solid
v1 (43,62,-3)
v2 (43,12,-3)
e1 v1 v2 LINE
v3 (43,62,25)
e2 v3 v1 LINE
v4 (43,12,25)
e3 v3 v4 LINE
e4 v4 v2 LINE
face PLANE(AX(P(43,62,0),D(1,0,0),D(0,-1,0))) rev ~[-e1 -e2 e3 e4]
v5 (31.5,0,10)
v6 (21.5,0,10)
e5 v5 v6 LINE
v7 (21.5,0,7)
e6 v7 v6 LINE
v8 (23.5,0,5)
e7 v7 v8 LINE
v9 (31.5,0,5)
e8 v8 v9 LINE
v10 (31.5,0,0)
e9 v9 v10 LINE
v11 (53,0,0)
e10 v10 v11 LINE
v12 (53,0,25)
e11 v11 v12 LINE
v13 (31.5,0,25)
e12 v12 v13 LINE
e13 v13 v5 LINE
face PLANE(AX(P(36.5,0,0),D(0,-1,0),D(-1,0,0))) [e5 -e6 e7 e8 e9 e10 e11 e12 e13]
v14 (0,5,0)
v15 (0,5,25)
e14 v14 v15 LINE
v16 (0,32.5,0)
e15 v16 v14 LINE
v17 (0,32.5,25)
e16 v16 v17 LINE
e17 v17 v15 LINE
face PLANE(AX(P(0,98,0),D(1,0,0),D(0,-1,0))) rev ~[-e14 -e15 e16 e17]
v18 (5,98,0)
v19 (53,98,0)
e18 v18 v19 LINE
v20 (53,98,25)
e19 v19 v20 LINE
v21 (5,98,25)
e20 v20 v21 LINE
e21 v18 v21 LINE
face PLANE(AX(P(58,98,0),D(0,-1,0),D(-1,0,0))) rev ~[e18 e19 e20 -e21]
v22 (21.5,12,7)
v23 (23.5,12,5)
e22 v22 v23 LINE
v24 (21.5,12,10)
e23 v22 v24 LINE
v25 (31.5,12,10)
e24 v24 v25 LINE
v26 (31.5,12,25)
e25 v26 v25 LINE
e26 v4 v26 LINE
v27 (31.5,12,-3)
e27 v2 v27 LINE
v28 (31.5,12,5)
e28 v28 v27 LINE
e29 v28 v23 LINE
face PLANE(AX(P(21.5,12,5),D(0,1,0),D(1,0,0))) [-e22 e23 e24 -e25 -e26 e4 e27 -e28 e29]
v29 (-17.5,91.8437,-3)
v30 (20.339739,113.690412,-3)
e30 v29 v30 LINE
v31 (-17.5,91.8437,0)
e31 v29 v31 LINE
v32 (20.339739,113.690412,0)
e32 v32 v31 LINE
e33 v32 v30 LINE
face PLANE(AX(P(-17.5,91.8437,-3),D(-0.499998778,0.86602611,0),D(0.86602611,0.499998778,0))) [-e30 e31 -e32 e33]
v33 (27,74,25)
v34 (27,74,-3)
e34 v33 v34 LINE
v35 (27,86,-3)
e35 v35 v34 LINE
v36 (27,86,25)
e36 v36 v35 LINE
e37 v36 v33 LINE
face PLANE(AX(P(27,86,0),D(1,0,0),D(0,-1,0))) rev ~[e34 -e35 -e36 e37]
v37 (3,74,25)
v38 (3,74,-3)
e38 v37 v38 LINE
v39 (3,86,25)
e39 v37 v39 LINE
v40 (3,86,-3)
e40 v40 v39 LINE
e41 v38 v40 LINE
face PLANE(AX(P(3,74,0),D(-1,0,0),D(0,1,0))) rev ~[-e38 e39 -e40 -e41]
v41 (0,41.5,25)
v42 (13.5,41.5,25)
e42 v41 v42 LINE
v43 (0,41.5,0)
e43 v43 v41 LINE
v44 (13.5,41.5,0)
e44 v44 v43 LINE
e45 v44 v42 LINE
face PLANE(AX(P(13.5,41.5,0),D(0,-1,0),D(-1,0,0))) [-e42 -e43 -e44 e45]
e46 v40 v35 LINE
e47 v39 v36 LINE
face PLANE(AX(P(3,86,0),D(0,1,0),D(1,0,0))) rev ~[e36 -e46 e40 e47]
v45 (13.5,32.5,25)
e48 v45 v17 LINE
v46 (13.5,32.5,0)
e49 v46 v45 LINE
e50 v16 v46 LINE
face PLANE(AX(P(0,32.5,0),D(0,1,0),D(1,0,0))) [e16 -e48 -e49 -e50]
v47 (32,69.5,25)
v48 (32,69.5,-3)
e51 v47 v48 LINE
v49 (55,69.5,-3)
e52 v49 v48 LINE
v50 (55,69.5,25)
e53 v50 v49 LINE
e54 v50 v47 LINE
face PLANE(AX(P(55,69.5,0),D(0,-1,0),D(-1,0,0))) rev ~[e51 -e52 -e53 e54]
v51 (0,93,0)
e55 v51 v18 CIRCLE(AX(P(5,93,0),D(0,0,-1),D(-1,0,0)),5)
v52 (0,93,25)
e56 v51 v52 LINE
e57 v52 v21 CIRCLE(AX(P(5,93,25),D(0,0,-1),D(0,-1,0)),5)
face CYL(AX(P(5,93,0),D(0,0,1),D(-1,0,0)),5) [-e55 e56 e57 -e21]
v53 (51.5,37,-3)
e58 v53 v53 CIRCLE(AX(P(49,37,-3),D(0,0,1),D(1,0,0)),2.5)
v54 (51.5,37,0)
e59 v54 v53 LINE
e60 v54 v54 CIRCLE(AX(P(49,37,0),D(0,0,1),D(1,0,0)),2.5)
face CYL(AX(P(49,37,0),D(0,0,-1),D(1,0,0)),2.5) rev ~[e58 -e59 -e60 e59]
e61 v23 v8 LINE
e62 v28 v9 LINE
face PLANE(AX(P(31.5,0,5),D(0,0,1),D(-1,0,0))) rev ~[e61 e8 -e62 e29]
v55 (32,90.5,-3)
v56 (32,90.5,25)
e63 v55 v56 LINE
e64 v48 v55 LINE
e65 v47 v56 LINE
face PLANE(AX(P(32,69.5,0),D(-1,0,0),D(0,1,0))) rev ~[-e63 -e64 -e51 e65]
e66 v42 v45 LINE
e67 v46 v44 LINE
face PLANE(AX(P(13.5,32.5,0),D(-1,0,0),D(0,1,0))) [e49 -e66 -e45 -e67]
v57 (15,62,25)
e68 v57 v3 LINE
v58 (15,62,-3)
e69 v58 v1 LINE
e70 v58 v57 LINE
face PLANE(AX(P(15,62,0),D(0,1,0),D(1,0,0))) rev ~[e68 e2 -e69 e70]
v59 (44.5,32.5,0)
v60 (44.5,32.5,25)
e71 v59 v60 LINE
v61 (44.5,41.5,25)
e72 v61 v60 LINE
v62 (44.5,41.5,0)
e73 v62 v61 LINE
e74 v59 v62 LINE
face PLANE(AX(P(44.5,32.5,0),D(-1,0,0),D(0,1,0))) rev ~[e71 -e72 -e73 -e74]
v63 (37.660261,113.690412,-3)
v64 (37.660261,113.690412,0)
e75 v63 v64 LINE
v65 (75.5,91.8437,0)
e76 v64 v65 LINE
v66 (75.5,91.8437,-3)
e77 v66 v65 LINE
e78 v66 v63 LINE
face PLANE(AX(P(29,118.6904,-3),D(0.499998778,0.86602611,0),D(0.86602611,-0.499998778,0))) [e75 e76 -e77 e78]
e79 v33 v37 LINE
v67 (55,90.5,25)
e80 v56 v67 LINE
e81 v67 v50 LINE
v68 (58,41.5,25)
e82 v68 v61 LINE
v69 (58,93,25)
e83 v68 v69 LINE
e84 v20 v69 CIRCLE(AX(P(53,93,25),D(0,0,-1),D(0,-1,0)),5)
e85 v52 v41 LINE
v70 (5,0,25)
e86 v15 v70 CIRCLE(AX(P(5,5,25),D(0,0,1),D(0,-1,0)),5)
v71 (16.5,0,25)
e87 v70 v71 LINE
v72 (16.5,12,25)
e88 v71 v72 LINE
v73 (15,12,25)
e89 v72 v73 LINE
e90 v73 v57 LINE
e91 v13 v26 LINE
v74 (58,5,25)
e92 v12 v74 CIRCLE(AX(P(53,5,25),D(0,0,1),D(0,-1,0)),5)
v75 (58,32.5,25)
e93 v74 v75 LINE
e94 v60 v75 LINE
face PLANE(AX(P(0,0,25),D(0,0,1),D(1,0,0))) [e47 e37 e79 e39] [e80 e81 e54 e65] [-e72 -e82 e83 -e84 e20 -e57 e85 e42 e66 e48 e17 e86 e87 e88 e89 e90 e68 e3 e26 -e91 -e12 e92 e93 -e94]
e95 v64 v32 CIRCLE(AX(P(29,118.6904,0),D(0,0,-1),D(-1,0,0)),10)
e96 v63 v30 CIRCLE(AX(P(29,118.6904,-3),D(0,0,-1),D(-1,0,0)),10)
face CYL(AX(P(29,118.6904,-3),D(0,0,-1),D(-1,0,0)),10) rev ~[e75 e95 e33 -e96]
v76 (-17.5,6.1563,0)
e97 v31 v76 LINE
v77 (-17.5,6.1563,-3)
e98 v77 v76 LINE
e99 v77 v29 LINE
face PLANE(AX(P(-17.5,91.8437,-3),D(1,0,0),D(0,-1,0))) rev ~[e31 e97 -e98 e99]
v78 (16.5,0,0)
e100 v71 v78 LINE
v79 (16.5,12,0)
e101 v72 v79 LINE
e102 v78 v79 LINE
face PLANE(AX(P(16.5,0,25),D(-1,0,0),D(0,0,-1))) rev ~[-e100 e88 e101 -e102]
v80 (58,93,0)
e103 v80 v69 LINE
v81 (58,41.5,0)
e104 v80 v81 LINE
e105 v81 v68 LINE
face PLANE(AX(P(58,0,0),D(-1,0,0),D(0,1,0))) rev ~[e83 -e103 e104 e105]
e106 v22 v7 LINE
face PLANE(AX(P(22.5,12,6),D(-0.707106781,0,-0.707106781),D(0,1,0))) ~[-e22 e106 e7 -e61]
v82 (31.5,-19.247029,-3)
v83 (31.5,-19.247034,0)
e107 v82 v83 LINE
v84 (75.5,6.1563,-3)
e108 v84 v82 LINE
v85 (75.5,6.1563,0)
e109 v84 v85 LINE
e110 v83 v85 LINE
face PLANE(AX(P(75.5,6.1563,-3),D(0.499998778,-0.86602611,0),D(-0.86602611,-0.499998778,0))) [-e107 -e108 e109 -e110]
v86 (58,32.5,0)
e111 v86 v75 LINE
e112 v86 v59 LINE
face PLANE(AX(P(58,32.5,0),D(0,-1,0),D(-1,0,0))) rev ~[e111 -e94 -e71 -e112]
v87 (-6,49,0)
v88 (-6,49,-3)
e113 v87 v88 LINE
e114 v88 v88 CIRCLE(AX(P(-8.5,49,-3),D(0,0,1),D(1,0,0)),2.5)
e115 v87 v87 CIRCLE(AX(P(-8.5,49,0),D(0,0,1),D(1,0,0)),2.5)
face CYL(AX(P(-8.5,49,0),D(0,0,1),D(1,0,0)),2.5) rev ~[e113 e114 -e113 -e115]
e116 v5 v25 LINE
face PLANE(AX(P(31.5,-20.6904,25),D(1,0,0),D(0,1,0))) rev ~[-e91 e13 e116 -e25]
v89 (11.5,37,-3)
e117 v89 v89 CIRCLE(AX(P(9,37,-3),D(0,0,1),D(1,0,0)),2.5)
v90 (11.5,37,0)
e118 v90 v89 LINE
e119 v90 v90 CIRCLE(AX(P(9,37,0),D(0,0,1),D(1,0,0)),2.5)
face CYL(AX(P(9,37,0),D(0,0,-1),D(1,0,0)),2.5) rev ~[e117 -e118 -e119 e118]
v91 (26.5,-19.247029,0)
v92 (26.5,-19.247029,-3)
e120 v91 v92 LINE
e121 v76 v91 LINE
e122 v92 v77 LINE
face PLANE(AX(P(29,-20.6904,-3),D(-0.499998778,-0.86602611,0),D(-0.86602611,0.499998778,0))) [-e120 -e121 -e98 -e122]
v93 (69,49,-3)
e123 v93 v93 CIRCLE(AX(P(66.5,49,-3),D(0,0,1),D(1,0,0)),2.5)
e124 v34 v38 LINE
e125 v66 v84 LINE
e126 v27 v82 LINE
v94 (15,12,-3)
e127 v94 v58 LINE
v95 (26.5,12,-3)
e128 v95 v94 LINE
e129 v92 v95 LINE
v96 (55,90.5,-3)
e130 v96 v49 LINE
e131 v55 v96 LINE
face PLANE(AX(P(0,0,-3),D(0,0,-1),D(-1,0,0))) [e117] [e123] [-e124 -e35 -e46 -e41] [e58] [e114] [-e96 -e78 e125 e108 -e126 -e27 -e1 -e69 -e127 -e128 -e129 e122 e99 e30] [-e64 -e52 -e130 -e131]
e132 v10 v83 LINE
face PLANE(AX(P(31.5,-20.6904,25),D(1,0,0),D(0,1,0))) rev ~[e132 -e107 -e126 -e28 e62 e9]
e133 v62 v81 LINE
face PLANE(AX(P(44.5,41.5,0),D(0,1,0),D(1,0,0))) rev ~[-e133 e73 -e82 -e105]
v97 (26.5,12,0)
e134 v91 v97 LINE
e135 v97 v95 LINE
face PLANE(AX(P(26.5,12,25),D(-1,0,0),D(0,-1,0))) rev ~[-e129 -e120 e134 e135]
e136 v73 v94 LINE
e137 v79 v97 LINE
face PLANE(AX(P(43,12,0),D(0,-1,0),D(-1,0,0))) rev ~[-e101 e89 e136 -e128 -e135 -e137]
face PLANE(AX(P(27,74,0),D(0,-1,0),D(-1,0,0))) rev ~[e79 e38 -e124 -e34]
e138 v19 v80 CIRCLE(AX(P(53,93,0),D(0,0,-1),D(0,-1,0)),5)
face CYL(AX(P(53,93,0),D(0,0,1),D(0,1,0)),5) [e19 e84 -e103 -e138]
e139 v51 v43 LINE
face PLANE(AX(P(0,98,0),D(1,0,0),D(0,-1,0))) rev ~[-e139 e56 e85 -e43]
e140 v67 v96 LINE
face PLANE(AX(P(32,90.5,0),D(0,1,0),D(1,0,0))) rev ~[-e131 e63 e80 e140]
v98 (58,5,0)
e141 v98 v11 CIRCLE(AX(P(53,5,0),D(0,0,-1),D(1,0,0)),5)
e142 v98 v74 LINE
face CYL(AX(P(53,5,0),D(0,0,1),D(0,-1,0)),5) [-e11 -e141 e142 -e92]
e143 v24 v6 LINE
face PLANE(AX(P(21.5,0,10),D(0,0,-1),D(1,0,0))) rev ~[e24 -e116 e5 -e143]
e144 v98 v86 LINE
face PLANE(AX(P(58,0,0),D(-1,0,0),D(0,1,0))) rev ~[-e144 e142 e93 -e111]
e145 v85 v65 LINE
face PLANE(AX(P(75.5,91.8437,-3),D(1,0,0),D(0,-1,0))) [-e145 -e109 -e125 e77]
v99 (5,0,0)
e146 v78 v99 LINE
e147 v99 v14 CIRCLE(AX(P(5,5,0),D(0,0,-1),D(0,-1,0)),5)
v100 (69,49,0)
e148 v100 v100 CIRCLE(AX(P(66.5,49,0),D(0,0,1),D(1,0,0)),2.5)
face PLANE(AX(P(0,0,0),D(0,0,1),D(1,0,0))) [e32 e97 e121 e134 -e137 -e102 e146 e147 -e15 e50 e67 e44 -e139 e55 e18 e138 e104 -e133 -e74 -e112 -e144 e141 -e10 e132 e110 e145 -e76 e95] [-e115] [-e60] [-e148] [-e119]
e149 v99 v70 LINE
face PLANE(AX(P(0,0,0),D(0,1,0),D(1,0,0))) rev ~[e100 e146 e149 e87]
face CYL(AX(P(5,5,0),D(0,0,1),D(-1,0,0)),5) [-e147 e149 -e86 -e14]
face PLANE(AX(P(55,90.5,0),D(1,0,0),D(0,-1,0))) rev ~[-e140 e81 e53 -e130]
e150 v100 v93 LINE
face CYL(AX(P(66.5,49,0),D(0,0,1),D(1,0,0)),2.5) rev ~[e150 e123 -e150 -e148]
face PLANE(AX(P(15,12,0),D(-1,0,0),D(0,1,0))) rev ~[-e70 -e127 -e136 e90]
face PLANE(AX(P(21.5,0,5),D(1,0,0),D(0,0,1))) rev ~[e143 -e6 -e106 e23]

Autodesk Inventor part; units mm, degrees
ref_plane "YZ Plane" through (0, 0, 0) normal (1, 0, 0) x (0, 1, 0)
ref_plane "XZ Plane" through (0, 0, 0) normal (0, 1, 0) x (-1, 0, 0)
ref_plane "XY Plane" through (0, 0, 0) normal (0, 0, 1) x (1, 0, 0)
sketch "Sketch1" plane through (0, 0, 0) normal (0, 0, 1) x (1, 0, 0)
  line L0 (0, 0) -> (58, 0)
  line L1 (58, 0) -> (58, 98)
  line L2 (58, 98) -> (0, 98)
  line L3 (0, 98) -> (0, 0)
  line L4 (15, 62) -> (43, 62)
  line L5 (43, 62) -> (43, 12)
  line L6 (43, 12) -> (15, 12)
  line L7 (15, 12) -> (15, 62)
  circle A0 centre (9, 37) radius 2.5
  circle A1 centre (49, 37) radius 2.5
  line L8 (9, 37) -> (49, 37) construction
  line L9 (3, 86) -> (27, 86)
  line L10 (27, 86) -> (27, 74)
  line L11 (27, 74) -> (3, 74)
  line L12 (3, 74) -> (3, 86)
  circle A2 centre (-8.5, 49) radius 2.5
  circle A3 centre (66.5, 49) radius 2.5
  line L13 (-8.5, 49) -> (66.5, 49) construction
  circle A4 centre (-8.5, 49) radius 5 construction
  circle A5 centre (66.5, 49) radius 5 construction
  line L14 (0, 0) -> (-13.3155, 47.6544)
  line L15 (0, 98) -> (-13.3155, 50.3456)
  line L16 (58, 98) -> (71.3155, 50.3456)
  line L17 (58, 0) -> (71.3155, 47.6544)
  arc A6 (-13.3155, 50.3456) -> (-13.3155, 47.6544) centre (-8.5, 49) ccw
  arc A7 (71.3155, 47.6544) -> (71.3155, 50.3456) centre (66.5, 49) ccw
  line L18 (32, 90.5) -> (55, 90.5)
  line L19 (55, 90.5) -> (55, 69.5)
  line L20 (55, 69.5) -> (32, 69.5)
  line L21 (32, 69.5) -> (32, 90.5)
  line L22 (3, 80) -> (55, 80) construction
  point P0 (29, 62)
  point P1 (29, 98)
  point P2 (29, 37)
  point P3 (15, 37)
  point P4 (29, 49)
  point P5 (0, 49)
  point P6 (29, 80)
  dimension "d0" = 58
  dimension "d1" = 98
  dimension "d2" = 28
  dimension "d3" = 50
  dimension "d4" = 12
  dimension "d5" = 5
  dimension "d6" = 5
  dimension "d7" = 40
  dimension "d9" = 24
  dimension "d10" = 12
  dimension "d12" = 12
  dimension "d13" = 5
  dimension "d14" = 5
  dimension "d15" = 75
  dimension "d16" = 10
  dimension "d17" = 10
  dimension "d18" = 23
  dimension "d19" = 21
  dimension "d20" = 5
extrude "Extrusion1" add sketch "Sketch1" against normal blind 3
extrude "Extrusion2" add sketch "Sketch1" along normal blind 25 contours L3 L2 L1 L0
fillet "Fillet1" radius 5 4 edges at (58, 98, 12.5) (58, 0, 12.5) (0, 0, 12.5) (0, 98, 12.5)
sketch "Sketch2" plane through (0, 0, 0) normal (0, 0, 1) x (1, 0, 0)
  circle A0 centre (49, 37) radius 2.5 projected
  circle A1 centre (9, 37) radius 2.5 projected
  line L0 (0, 5) -> (0, 93) projected
  line L1 (0, 32.5) -> (13.5, 32.5)
  line L2 (13.5, 32.5) -> (13.5, 41.5)
  line L3 (13.5, 41.5) -> (0, 41.5)
  line L4 (0, 41.5) -> (0, 32.5)
  line L5 (58, 5) -> (58, 93) projected
  line L6 (58, 32.5) -> (44.5, 32.5)
  line L7 (44.5, 32.5) -> (44.5, 41.5)
  line L8 (44.5, 41.5) -> (58, 41.5)
  line L9 (58, 41.5) -> (58, 32.5)
  line L10 (15, 62) -> (15, 12) projected
  line L11 (43, 12) -> (43, 62) projected
  point P0 (0, 0)
  point P1 (13.5, 37)
  point P2 (44.5, 37)
  dimension "d29" = 4.5
  dimension "d30" = 4.5
  dimension "d31" = 9
extrude "Extrusion3" cut sketch "Sketch2" along normal through all
sketch "Sketch3" plane through (0, 0, -3) normal (0, 0, -1) x (-1, 0, 0)
  circle A0 centre (-29, -5) radius 2.5 construction
  circle A1 centre (-29, 103) radius 2.5 construction
  line L0 (0, 98) -> (-58, 98) projected
  line L1 (-58, 0) -> (0, 0) projected
  line L2 (-58, 98) -> (-29.6325, 105.4187)
  line L3 (0, 98) -> (-28.3675, 105.4187)
  line L4 (0, 0) -> (-28.3675, -7.4187)
  line L5 (-58, 0) -> (-29.6325, -7.4187)
  arc A2 (-29.6325, -7.4187) -> (-28.3675, -7.4187) centre (-29, -5) ccw
  arc A3 (-28.3675, 105.4187) -> (-29.6325, 105.4187) centre (-29, 103) ccw
  point P0 (-29, 98)
  dimension "d34" = 5
  dimension "d35" = 5
  dimension "d36" = 5
  dimension "d37" = 5
extrude "Extrusion4" add sketch "Sketch3" against normal blind 3
fillet "Fillet2" radius 5 4 edges at (0, 98, -1.5) (58, 98, -1.5) (58, 0, -1.5) (0, 0, -1.5)
sketch "Sketch4" plane through (0, 0, -3) normal (0, 0, -1) x (-1, 0, 0)
  line L0 (-15, 62) -> (-15, 12) projected
  line L1 (-15, 12) -> (-43, 12) projected
  line L2 (-43, 12) -> (-43, 62) projected
  line L3 (-43, 62) -> (-15, 62) projected
  line L4 (-32, 90.5) -> (-32, 69.5) projected
  line L5 (-32, 69.5) -> (-55, 69.5) projected
  line L6 (-55, 69.5) -> (-55, 90.5) projected
  line L7 (-55, 90.5) -> (-32, 90.5) projected
  line L8 (-3, 86) -> (-3, 74) projected
  line L9 (-3, 74) -> (-27, 74) projected
  line L10 (-27, 74) -> (-27, 86) projected
  line L11 (-27, 86) -> (-3, 86) projected
  circle A0 centre (-49, 37) radius 2.5 projected
  circle A1 centre (-9, 37) radius 2.5 projected
  circle A2 centre (-66.5, 49) radius 2.5 projected
  circle A3 centre (8.5, 49) radius 2.5 projected
  arc A4 (-2.7778, -0.7265) -> (0.7727, 2.7653) centre (-4.0429, 4.1109) ccw projected
  line L12 (0.7727, 2.7653) -> (13.3155, 47.6544) projected
  arc A5 (13.3155, 47.6544) -> (13.3155, 50.3456) centre (8.5, 49) ccw projected
  line L13 (13.3155, 50.3456) -> (0.7727, 95.2347) projected
  arc A6 (0.7727, 95.2347) -> (-2.7778, 98.7265) centre (-4.0429, 93.8891) ccw projected
  line L14 (-28.3675, 105.4187) -> (-2.7778, 98.7265) projected
  arc A7 (-28.3675, 105.4187) -> (-29.6325, 105.4187) centre (-29, 103) ccw projected
  line L15 (-55.2222, 98.7265) -> (-29.6325, 105.4187) projected
  arc A8 (-55.2222, 98.7265) -> (-58.7727, 95.2347) centre (-53.9571, 93.8891) ccw projected
  line L16 (-58.7727, 95.2347) -> (-71.3155, 50.3456) projected
  arc A9 (-71.3155, 50.3456) -> (-71.3155, 47.6544) centre (-66.5, 49) ccw projected
  line L17 (-71.3155, 47.6544) -> (-58.7727, 2.7653) projected
  arc A10 (-58.7727, 2.7653) -> (-55.2222, -0.7265) centre (-53.9571, 4.1109) ccw projected
  line L18 (-55.2222, -0.7265) -> (-29.6325, -7.4187) projected
  arc A11 (-29.6325, -7.4187) -> (-28.3675, -7.4187) centre (-29, -5) ccw projected
  line L19 (-28.3675, -7.4187) -> (-2.7778, -0.7265) projected
  arc A12 (-27.3554, 109.2885) -> (-30.6446, 109.2885) centre (-29, 103) ccw
  line L20 (-27.3554, 109.2885) -> (-1.7658, 102.5963)
  arc A13 (4.6251, 96.3111) -> (-1.7658, 102.5963) centre (-4.0429, 93.8891) ccw
  line L21 (4.6251, 96.3111) -> (17.168, 51.422)
  arc A14 (17.168, 46.578) -> (17.168, 51.422) centre (8.5, 49) ccw
  line L22 (17.168, 46.578) -> (4.6251, 1.6889)
  arc A15 (-1.7658, -4.5963) -> (4.6251, 1.6889) centre (-4.0429, 4.1109) ccw
  line L23 (-1.7658, -4.5963) -> (-27.3554, -11.2885)
  arc A16 (-30.6446, -11.2885) -> (-27.3554, -11.2885) centre (-29, -5) ccw
  line L24 (-30.6446, -11.2885) -> (-56.2342, -4.5963)
  arc A17 (-62.6251, 1.6889) -> (-56.2342, -4.5963) centre (-53.9571, 4.1109) ccw
  line L25 (-62.6251, 1.6889) -> (-75.168, 46.578)
  arc A18 (-75.168, 51.422) -> (-75.168, 46.578) centre (-66.5, 49) ccw
  line L26 (-75.168, 51.422) -> (-62.6251, 96.3111)
  arc A19 (-56.2342, 102.5963) -> (-62.6251, 96.3111) centre (-53.9571, 93.8891) ccw
  line L27 (-56.2342, 102.5963) -> (-30.6446, 109.2885)
  point P0 (0, 0)
  dimension "d41" = 4
extrude "Extrusion5" add sketch "Sketch4" against normal blind 3 contours L20 A13 L21 A14 L22 A15 L23 A16 L24 A17 L25 A18 L26 A19 L27 A12
sketch "Sketch6" plane through (0, 0, -3) normal (0, 0, -1) x (-1, 0, 0)
  line L0 (-29, 118.6904) -> (17.5, 91.8437) construction
  line L1 (17.5, 91.8437) -> (17.5, 38.1501) construction
  line L2 (17.5, 38.1501) -> (-29, 11.3033) construction
  line L3 (-29, 11.3033) -> (-75.5, 38.1501) construction
  line L4 (-75.5, 38.1501) -> (-75.5, 91.8437) construction
  line L5 (-75.5, 91.8437) -> (-29, 118.6904) construction
  line L6 (-29, -20.6904) -> (-75.5, 6.1563) construction
  line L7 (-75.5, 6.1563) -> (-75.5, 59.8499) construction
  line L8 (-75.5, 59.8499) -> (-29, 86.6967) construction
  line L9 (-29, 86.6967) -> (17.5, 59.8499) construction
  line L10 (17.5, 59.8499) -> (17.5, 6.1563) construction
  line L11 (17.5, 6.1563) -> (-29, -20.6904) construction
  line L12 (-15, 12) -> (-43, 12) construction
  arc A0 (-75.168, 51.422) -> (-75.168, 46.578) centre (-66.5, 49) ccw construction
  line L13 (-75.5, 59.8499) -> (-75.5, 38.1501) construction
  line L14 (17.5, 59.8499) -> (17.5, 38.1501) construction
  arc A1 (17.168, 46.578) -> (17.168, 51.422) centre (8.5, 49) ccw construction
  arc A2 (4.6251, 96.3111) -> (-1.7658, 102.5963) centre (-4.0429, 93.8891) ccw construction
  arc A3 (-1.7658, -4.5963) -> (4.6251, 1.6889) centre (-4.0429, 4.1109) ccw construction
  line L15 (-72.6977, 49) -> (-55.2357, 96.3111)
  line L16 (-55.2357, 96.3111) -> (0, 98)
  line L17 (0, 98) -> (14.2585, 49.0151)
  line L18 (14.2585, 49.0151) -> (2.9964, 0)
  line L19 (2.9964, 0) -> (-59.2966, 2.9606)
  line L20 (-59.2966, 2.9606) -> (-72.6977, 49)
  line L21 (-75.5, 91.8437) -> (-75.5, 6.1563)
  line L22 (-75.5, 6.1563) -> (-29, -20.6904)
  line L23 (-29, -20.6904) -> (17.5, 6.1563)
  line L24 (17.5, 91.8437) -> (17.5, 6.1563)
  line L25 (17.5, 91.8437) -> (-29, 118.6904)
  line L26 (-29, 118.6904) -> (-75.5, 91.8437)
  point P0 (0, 0)
  point P1 (-29, 64.9969)
  point P2 (-29, 33.0031)
  point P3 (-29, 12)
extrude "Extrusion7" add sketch "Sketch6" against normal blind 3
sketch "Sketch7" plane through (0, 0, -3) normal (0, 0, -1) x (-1, 0, 0)
  line L0 (-75.5, 91.8437) -> (-29, 118.6904) projected
  circle A0 centre (-29, 118.6904) radius 10
  point P0 (0, 0)
  dimension "d48" = 20
extrude "Extrusion8" cut sketch "Sketch7" against normal through all
sketch "Sketch9" plane through (0, 0, 25) normal (0, 0, 1) x (1, 0, 0)
  line L0 (26.5, 12) -> (26.5, -20.6904)
  line L1 (26.5, -20.6904) -> (31.5, -20.6904)
  line L2 (31.5, -20.6904) -> (31.5, 12)
  line L3 (31.5, 12) -> (26.5, 12)
  line L4 (29, 12) -> (29, -20.6904) construction
  line L5 (43, 12) -> (15, 12) projected
  point P0 (0, 0)
  dimension "d51" = 5
extrude "Extrusion9" cut sketch "Sketch9" against normal through all
sketch "Sketch11" plane through (0, 0, 0) normal (0, 0, 1) x (1, 0, 0)
  line L0 (31.5, 0) -> (31.5, -19.2471) projected
  line L1 (31.5, 0) -> (53, 0) projected
  line L2 (31.5, -19.2471) -> (75.5, 6.1563) projected
  line L3 (31.5, 0) -> (53, 0) projected
  line L4 (36.5, 0) -> (36.5, -16.3603)
  line L5 (31.5, -19.2471) -> (36.5, -16.3603)
  line L6 (31.5, 0) -> (36.5, 0)
  point P0 (0, 0)
  dimension "d54" = 5
extrude "Extrusion10" add sketch "Sketch11" along normal blind 5
sketch "Sketch12" plane through (0, 0, 5) normal (0, 0, 1) x (1, 0, 0)
  line L0 (31.5, -19.2471) -> (75.5, 6.1563) projected
  line L1 (31.5, -19.2471) -> (29, -20.6904)
  line L2 (29, -20.6904) -> (26.5, -19.2471)
  line L3 (-17.5, 6.1563) -> (26.5, -19.2471) projected
  line L4 (-17.5, 6.1563) -> (26.5, -19.2471) projected
  line L5 (21.5, -16.3603) -> (21.5, 0)
  line L6 (5, 0) -> (26.5, 0) projected
  line L7 (21.5, 0) -> (36.5, 0)
  line L8 (36.5, 0) -> (36.5, -16.3603)
  line L9 (31.5, 0) -> (31.5, -19.2471) projected
  line L10 (31.5, -19.2471) -> (36.5, -16.3603) projected
  line L11 (36.5, -16.3603) -> (36.5, 0) projected
  line L12 (31.5, 0) -> (36.5, 0) projected
  line L13 (26.5, -19.2471) -> (26.5, 0) projected
  line L14 (21.5, -16.3603) -> (26.5, -19.2471)
  line L15 (29, -20.6904) -> (36.5, -16.3603)
  line L16 (21.5, 0) -> (36.5, 0)
  line L17 (31.5, 0) -> (53, 0) projected
  line L18 (21.5, -16.3603) -> (29, -20.6904)
  line L19 (29, -20.6904) -> (36.5, -16.3603)
  line L20 (36.5, -16.3603) -> (36.5, 0)
  line L21 (21.5, 0) -> (21.5, -16.3603)
  point P0 (0, 0)
  dimension "d57" = 5
extrude "Extrusion11" add sketch "Sketch12" along normal blind 5
sketch "Sketch13" plane through (5, 0, 0) normal (0, -1, 0) x (1, 0, 0)
  line L0 (21.5, 25) -> (21.5, -3) projected
  line L1 (0, 0) -> (21.5, 0) projected
  line L2 (21.5, 25) -> (11.5, 25)
  line L3 (11.5, 25) -> (11.5, 0)
  line L4 (11.5, 0) -> (21.5, 0)
  line L5 (21.5, 0) -> (21.5, 25)
  point P0 (-5, 0)
  dimension "d60" = 10
extrude "Extrusion12" cut sketch "Sketch13" against normal blind 15
sketch "Sketch14" plane through (21.5, 0, 5) normal (0, 1, 0) x (1, 0, 0)
  line L0 (10, -5) -> (10, 0) projected
  line L1 (10, 0) -> (0, 0) projected
  line L2 (0, 0) -> (0, -5) projected
  line L3 (0, -5) -> (10, -5) projected
  point P0 (-21.5, 5)
extrude "Extrusion13" add sketch "Sketch14" along normal blind 12
sketch "Sketch15" plane through (0, 0, 0) normal (0, 0, 1) x (1, 0, 0)
  line L0 (36.5, 0) -> (53, 0) projected
  line L1 (36.5, 0) -> (21.5, 0)
  line L2 (21.5, 0) -> (21.5, -20.6904)
  line L3 (21.5, -20.6904) -> (36.5, -20.6904)
  line L4 (36.5, -20.6904) -> (36.5, 0)
  point P0 (0, 0)
  point P1 (21.5, -16.3603)
  point P2 (29, -20.6904)
  point P3 (29, -20.6904)
extrude "Extrusion14" cut sketch "Sketch15" along normal through all
chamfer "Chamfer1" distance 2 angle 45 1 edges at (21.5, 6, 5)
properties part number "BA27" material "ABS Plastic"
